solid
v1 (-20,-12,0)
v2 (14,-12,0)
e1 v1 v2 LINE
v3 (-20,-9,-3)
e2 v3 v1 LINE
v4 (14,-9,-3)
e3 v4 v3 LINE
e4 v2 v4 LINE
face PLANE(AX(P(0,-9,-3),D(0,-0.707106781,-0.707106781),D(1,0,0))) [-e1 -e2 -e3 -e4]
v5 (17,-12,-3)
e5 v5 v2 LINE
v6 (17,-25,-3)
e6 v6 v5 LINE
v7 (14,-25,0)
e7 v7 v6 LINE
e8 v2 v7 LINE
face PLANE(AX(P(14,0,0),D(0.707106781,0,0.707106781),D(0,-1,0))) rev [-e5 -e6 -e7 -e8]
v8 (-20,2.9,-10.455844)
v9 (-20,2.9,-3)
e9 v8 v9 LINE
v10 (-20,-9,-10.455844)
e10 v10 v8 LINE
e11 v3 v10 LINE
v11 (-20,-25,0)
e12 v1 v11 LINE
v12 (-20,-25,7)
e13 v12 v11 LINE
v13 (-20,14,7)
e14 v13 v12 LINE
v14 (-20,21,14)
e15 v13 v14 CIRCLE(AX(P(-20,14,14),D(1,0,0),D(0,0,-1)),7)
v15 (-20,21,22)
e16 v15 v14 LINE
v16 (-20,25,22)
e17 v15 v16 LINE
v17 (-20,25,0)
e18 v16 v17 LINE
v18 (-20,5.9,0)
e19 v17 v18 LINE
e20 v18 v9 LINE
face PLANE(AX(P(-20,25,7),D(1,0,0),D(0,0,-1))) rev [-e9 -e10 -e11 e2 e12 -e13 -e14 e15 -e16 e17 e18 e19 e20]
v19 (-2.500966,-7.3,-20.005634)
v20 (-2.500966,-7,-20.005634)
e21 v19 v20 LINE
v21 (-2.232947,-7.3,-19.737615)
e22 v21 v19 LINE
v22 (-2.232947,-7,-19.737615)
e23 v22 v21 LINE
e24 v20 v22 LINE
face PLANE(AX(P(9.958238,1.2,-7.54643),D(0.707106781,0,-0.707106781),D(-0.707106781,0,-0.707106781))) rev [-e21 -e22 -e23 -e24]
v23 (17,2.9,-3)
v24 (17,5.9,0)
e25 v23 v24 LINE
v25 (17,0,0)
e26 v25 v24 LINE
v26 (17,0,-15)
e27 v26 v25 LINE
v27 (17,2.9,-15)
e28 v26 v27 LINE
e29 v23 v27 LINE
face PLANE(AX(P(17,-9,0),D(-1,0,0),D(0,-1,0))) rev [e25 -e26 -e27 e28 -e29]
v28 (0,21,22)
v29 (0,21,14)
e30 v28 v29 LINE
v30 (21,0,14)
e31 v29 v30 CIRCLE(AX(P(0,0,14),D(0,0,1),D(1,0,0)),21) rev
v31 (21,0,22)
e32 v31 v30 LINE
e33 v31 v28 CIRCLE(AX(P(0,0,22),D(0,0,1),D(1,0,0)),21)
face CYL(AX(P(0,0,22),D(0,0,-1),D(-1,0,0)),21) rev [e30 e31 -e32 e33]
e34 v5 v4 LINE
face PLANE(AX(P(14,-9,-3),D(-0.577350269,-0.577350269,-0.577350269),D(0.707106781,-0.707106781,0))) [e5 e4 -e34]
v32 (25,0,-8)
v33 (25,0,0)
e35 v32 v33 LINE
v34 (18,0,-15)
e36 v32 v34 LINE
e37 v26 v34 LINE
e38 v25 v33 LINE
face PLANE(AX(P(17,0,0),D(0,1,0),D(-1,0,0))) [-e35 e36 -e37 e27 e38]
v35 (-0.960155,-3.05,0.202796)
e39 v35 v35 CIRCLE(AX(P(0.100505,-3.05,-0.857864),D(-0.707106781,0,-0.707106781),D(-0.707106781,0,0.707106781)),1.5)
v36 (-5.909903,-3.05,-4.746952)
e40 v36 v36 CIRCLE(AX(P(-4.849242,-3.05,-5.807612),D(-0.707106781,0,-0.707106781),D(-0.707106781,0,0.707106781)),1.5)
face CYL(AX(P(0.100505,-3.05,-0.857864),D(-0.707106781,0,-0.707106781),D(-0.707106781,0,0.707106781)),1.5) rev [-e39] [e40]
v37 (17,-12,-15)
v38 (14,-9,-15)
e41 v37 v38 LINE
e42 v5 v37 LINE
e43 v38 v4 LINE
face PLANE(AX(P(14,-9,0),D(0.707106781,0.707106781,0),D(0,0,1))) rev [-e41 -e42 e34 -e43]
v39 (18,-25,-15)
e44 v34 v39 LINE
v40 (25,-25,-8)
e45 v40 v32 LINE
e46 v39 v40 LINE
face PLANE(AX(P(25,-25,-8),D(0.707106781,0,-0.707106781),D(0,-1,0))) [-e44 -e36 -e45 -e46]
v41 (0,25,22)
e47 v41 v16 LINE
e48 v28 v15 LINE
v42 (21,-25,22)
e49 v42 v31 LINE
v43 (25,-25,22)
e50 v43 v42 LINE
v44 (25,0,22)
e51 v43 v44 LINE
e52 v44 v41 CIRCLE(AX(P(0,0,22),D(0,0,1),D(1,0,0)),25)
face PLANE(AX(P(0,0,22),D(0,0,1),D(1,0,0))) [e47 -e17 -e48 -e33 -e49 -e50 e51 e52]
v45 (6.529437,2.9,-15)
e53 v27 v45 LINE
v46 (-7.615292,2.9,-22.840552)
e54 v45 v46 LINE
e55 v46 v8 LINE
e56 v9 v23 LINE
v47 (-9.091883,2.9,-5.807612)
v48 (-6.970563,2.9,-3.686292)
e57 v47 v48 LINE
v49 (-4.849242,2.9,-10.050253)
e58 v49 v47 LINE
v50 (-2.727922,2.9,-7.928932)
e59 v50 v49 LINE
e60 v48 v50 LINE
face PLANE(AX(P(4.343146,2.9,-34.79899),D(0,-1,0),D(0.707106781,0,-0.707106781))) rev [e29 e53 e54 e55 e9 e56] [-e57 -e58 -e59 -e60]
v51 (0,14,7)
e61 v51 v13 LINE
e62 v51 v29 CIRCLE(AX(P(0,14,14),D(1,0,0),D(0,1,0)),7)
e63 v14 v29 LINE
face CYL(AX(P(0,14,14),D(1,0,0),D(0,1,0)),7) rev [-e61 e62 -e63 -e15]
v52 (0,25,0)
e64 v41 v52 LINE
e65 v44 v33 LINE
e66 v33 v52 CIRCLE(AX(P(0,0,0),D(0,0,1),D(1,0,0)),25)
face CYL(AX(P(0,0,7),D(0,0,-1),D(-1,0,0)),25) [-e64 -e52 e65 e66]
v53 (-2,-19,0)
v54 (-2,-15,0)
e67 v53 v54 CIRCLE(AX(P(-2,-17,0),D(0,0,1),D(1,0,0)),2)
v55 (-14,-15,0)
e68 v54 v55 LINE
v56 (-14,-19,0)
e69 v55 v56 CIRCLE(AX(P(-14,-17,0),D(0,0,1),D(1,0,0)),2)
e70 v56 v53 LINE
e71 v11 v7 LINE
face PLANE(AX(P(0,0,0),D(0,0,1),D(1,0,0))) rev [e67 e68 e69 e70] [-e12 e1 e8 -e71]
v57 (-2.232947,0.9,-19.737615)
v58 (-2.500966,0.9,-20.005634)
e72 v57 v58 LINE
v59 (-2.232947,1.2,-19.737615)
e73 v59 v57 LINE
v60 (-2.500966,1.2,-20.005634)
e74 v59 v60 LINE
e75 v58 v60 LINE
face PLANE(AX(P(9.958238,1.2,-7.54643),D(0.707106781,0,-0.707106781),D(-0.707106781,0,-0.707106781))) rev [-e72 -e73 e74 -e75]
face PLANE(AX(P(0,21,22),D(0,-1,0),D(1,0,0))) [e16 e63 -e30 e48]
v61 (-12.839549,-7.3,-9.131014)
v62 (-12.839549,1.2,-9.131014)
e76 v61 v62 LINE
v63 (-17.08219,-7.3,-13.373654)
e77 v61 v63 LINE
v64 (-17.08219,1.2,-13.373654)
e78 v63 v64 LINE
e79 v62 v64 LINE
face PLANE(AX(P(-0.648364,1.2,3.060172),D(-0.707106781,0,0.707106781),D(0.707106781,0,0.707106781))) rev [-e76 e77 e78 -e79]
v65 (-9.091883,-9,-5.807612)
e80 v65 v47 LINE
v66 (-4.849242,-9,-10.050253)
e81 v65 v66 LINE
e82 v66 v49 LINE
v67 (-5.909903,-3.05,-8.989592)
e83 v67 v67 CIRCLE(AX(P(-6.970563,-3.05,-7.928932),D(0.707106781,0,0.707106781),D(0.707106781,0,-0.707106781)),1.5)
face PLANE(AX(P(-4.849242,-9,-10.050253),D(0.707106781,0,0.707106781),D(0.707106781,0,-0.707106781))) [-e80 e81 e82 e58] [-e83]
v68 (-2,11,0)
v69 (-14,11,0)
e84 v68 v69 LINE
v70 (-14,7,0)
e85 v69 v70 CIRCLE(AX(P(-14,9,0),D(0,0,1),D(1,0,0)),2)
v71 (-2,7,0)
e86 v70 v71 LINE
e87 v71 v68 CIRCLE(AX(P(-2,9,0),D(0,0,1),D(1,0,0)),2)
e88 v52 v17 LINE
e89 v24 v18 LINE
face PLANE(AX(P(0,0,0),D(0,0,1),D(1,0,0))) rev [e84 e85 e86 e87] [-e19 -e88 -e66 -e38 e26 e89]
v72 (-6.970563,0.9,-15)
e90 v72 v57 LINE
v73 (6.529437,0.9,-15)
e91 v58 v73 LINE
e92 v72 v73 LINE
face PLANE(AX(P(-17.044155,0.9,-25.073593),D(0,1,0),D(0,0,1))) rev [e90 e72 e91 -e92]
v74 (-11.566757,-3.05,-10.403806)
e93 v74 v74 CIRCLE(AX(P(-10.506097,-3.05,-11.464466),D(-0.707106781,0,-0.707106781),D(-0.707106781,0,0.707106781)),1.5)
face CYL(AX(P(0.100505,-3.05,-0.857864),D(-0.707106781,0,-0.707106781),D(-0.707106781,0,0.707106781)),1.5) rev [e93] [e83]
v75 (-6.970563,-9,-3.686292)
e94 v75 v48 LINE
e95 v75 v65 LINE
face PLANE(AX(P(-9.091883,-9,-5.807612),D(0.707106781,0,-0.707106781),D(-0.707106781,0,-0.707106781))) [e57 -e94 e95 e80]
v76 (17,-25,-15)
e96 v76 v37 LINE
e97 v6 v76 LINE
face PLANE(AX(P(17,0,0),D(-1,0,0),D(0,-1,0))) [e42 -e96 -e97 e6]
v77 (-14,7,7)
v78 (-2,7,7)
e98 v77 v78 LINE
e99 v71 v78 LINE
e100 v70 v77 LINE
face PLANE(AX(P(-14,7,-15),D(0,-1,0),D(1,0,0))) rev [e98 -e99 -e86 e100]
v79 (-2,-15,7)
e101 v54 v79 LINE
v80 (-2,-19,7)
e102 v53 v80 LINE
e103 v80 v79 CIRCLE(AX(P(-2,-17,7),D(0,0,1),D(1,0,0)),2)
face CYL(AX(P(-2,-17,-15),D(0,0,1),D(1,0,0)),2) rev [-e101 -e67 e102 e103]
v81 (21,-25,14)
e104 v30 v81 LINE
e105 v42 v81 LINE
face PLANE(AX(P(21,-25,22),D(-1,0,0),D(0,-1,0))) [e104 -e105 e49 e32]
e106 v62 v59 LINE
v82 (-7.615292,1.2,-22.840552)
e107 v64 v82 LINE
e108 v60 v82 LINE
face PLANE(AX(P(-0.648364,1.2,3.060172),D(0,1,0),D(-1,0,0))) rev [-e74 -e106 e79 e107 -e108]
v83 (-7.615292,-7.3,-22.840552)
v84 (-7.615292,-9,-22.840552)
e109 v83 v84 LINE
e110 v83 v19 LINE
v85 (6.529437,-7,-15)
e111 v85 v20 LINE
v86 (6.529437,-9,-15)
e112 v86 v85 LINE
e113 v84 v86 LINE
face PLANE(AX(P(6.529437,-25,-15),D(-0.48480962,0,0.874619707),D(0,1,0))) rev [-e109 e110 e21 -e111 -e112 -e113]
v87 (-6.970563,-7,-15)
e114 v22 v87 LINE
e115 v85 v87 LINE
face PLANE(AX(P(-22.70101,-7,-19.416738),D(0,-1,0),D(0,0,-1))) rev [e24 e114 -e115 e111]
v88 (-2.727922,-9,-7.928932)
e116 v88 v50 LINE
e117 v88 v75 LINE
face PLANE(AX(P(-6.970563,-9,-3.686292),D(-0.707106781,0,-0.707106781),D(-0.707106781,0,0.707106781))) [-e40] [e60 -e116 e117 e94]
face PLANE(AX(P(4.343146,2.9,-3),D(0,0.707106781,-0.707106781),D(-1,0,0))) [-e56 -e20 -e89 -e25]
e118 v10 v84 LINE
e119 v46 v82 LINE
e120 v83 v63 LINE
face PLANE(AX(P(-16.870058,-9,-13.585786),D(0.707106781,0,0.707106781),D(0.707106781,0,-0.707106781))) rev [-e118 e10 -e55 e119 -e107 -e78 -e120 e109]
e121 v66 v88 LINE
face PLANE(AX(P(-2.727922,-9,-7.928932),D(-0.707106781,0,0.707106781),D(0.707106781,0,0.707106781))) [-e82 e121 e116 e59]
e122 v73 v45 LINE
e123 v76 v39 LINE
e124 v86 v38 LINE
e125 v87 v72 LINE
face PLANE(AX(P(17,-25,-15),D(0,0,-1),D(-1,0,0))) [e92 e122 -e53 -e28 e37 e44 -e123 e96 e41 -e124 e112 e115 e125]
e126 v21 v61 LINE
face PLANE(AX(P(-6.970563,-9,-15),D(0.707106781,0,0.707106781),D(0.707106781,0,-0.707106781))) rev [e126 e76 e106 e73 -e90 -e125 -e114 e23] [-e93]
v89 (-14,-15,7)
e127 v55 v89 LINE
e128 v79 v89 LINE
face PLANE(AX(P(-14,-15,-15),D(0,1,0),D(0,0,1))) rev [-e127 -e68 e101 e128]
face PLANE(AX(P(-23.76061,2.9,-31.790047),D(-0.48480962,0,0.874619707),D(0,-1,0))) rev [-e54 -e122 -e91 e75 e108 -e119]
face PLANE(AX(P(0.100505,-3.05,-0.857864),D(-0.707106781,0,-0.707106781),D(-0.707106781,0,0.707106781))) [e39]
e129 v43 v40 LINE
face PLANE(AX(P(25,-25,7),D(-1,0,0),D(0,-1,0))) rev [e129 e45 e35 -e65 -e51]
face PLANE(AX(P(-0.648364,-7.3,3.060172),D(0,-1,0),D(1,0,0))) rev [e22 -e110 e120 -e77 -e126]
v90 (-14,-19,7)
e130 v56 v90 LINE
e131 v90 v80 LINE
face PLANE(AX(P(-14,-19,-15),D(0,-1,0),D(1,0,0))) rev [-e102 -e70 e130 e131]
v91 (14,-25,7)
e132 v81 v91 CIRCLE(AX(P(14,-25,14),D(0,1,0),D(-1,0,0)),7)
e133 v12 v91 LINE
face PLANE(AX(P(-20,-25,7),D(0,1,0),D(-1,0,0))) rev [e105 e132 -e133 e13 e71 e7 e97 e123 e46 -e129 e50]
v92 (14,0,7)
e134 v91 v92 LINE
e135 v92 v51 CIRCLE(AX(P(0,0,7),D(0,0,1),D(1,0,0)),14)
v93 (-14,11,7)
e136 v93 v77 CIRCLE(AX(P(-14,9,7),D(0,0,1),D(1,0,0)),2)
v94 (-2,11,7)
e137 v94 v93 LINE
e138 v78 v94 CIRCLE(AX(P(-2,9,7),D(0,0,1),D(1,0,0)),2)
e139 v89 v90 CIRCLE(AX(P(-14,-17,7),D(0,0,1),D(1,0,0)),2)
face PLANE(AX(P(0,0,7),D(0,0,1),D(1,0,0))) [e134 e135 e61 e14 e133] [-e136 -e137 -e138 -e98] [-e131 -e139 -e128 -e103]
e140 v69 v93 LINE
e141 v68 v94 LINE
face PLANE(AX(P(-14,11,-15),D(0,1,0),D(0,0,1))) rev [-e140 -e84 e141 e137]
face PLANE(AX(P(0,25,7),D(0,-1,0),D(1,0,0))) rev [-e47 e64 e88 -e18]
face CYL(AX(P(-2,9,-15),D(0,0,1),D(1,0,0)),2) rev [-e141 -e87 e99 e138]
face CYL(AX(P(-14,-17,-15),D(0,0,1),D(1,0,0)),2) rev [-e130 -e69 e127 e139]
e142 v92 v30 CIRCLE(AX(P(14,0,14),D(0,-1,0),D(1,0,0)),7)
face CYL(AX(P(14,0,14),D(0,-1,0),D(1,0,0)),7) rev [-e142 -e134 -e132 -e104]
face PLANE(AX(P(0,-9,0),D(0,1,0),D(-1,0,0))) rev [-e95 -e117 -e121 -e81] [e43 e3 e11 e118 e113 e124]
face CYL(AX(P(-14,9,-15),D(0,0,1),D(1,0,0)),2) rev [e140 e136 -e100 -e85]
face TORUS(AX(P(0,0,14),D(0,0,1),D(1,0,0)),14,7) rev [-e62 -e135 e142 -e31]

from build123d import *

# Parameters (mm, degrees)
BOSS_EXTRUDE1_DEPTH      = 7
EXTRUDE_THIN2_DEPTH      = 15
FILLET1_R                = 7
SKETCH5_W                = 15
SKETCH5_H                = 25
BOSS_EXTRUDE2_DEPTH      = 8
CUT_EXTRUDE2_DEPTH       = 42.641325627
LPATTERN1_COUNT          = 2
LPATTERN1_PITCH          = 26
CHAMFER3_SIZE            = 7
SKETCH9_W                = 15
SKETCH9_H                = 7
BOSS_EXTRUDE3_DEPTH      = 15
BOSS_EXTRUDE4_DEPTH      = 2
BOSS_EXTRUDE4_DEPTH_BACK = 9.9
SKETCH13_W               = 8
SKETCH13_H               = 2
BOSS_EXTRUDE6_DEPTH      = 6
CHAMFER6_SIZE            = 23.744712882
CHAMFER6_SIZE_2          = 13.5
CHAMFER7_SIZE            = 3
SKETCH14_R               = 1.5
CUT_EXTRUDE3_DEPTH       = 15
SKETCH15_W               = 15
SKETCH15_H               = 8.5
CUT_EXTRUDE4_DEPTH       = 6


with BuildPart() as part:
    # Sketch1 → Boss-Extrude1 (new body)
    with BuildSketch(Plane.XY):
        with BuildLine():
            Line((0, 25), (-20, 25))
            Line((-20, 25), (-20, -25))
            Line((-20, -25), (25, -25))
            Line((25, -25), (25, 0))
            ThreePointArc((25, 0), (17.67766953, 17.67766953), (0, 25))
        make_face()
    extrude(amount=BOSS_EXTRUDE1_DEPTH)

    # Sketch3 → Extrude-Thin2 (add)
    with BuildSketch(Plane.XY.offset(7)):
        with BuildLine():
            Line((25, -25), (25, 0))
            ThreePointArc((25, 0), (17.67766953, 17.67766953), (0, 25))
            Line((0, 25), (-20, 25))
            Line((-20, 25), (-20, 21))
            Line((-20, 21), (0, 21))
            ThreePointArc((0, 21), (14.849242405, 14.849242405), (21, 0))
            Line((21, 0), (21, -25))
            Line((21, -25), (25, -25))
        make_face()
    extrude(amount=EXTRUDE_THIN2_DEPTH)

    # Fillet1
    fillet1_edges = [part.edges().sort_by_distance(p)[0] for p in [
        (21, -12.5, 7),
        (14.849242405, 14.849242405, 7),
        (-10, 21, 7),
    ]]
    fillet(fillet1_edges, radius=FILLET1_R)

    # Sketch5 → Boss-Extrude2 (add)
    with BuildSketch(Plane(origin=(25, 0, 0), x_dir=(0, 0, -1), z_dir=(1, 0, 0))):
        with Locations((7.5, -12.5)):
            Rectangle(SKETCH5_W, SKETCH5_H)
    extrude(amount=-BOSS_EXTRUDE2_DEPTH)

    # Sketch8 → Cut-Extrude2 (cut, through all)
    with BuildSketch(Plane.XY.offset(7)):
        with BuildLine():
            Line((-14, -15), (-2, -15))
            ThreePointArc((-2, -15), (0, -17), (-2, -19))
            Line((-2, -19), (-14, -19))
            ThreePointArc((-14, -19), (-16, -17), (-14, -15))
        make_face()
    cut_extrude2 = extrude(amount=-CUT_EXTRUDE2_DEPTH, mode=Mode.SUBTRACT)

    # LPattern1: Cut-Extrude2 ×2
    with Locations(*[(0, i * LPATTERN1_PITCH, 0) for i in range(1, LPATTERN1_COUNT)]):
        add(cut_extrude2, mode=Mode.SUBTRACT)

    # Chamfer3
    chamfer3_edges = [part.edges().sort_by_distance(p)[0] for p in [
        (25, -12.5, -15),
    ]]
    chamfer(chamfer3_edges, length=CHAMFER3_SIZE)

    # Sketch9 → Boss-Extrude3 (add)
    with BuildSketch(Plane.ZY.offset(-17)):
        with Locations((-7.5, -3.5)):
            Rectangle(SKETCH9_W, SKETCH9_H)
    extrude(amount=BOSS_EXTRUDE3_DEPTH)

    # Sketch10 → Boss-Extrude4 (add, two sides: drawn at the far end of the back side and taken through both)
    with BuildSketch(Plane.XZ.offset(7).offset(-BOSS_EXTRUDE4_DEPTH_BACK)):
        Polygon((2, -15), (-6.970562748, -15), (-12.627416998, -9.343145751), (-16.870057685, -13.585786438), (-20, -10.455844123), (-20, 0), (17, 0), (17, -15), align=None)
        Polygon((-4.849242405, -10.050252532), (-9.091883092, -5.807611845), (-6.970562748, -3.686291501), (-2.727922061, -7.928932188), align=None, mode=Mode.SUBTRACT)
    extrude(amount=BOSS_EXTRUDE4_DEPTH + BOSS_EXTRUDE4_DEPTH_BACK)

    # Sketch13 → Boss-Extrude6 (add)
    with BuildSketch(Plane(origin=(-10.985281374, 0, -10.985281374), x_dir=(-0.7071067811865478, 0, 0.7071067811865472), z_dir=(-0.7071067811865472, 0, -0.7071067811865478))):
        with Locations((-1.67766953, 1.9)):
            Rectangle(SKETCH13_W, SKETCH13_H)
        with Locations((-1.67766953, -8)):
            Rectangle(SKETCH13_W, SKETCH13_H)
    extrude(amount=BOSS_EXTRUDE6_DEPTH)

    # Chamfer6
    # the kernel refuses this chamfer: 23.744712882, 13.5 mm, written as the material it adds along each edge
    with BuildSketch(Plane(origin=(-6.970562748, -9, -15), x_dir=(-0.7145740403020574, 0, -0.6995598194053126), z_dir=(0, 1, 0))) as chamfer6_piece_1_section:
        Polygon((CHAMFER6_SIZE * 0.999943641689, -CHAMFER6_SIZE * 0.0106166574102), (-CHAMFER6_SIZE_2 * 0.714574040302, -CHAMFER6_SIZE_2 * 0.699559819405), (0, 0), align=None)
    chamfer6_piece_1 = extrude(amount=2, mode=Mode.PRIVATE)
    chamfer6_piece_1 = split(chamfer6_piece_1, bisect_by=Plane(origin=(-9.095447466, -8, -21.360396657), z_dir=(0.7071067811865476, 0, 0.7071067811865476)), keep=Keep.TOP, mode=Mode.PRIVATE)
    add(chamfer6_piece_1)
    with BuildSketch(Plane(origin=(-6.970562748, -70.647744863, -15), x_dir=(-0.7145740403020574, 0, -0.6995598194053126), z_dir=(0, 1, 0))) as chamfer6_piece_2_section:
        Polygon((CHAMFER6_SIZE * 0.999943641689, -CHAMFER6_SIZE * 0.0106166574102), (-CHAMFER6_SIZE_2 * 0.714574040302, -CHAMFER6_SIZE_2 * 0.699559819405), (0, 0), align=None)
    chamfer6_piece_2 = extrude(amount=125.295489727, mode=Mode.PRIVATE)
    chamfer6_piece_2 = split(chamfer6_piece_2, bisect_by=Plane(origin=(-6.871868761, 2.9, -19.136817952), z_dir=(0, -1, 0)), keep=Keep.TOP, mode=Mode.PRIVATE)
    chamfer6_piece_2 = split(chamfer6_piece_2, bisect_by=Plane(origin=(-6.871868761, 0.9, -19.136817952), z_dir=(0, 1, 0)), keep=Keep.TOP, mode=Mode.PRIVATE)
    chamfer6_piece_2 = split(chamfer6_piece_2, bisect_by=Plane(origin=(-9.095447466, 1.9, -21.360396657), z_dir=(0.7071067811865476, 0, 0.7071067811865476)), keep=Keep.TOP, mode=Mode.PRIVATE)
    add(chamfer6_piece_2)
    with BuildSketch(Plane(origin=(-6.970562748, -60.747744863, -15), x_dir=(-0.7145740403020574, 0, -0.6995598194053126), z_dir=(0, 1, 0))) as chamfer6_piece_3_section:
        Polygon((CHAMFER6_SIZE * 0.999943641689, -CHAMFER6_SIZE * 0.0106166574102), (-CHAMFER6_SIZE_2 * 0.714574040302, -CHAMFER6_SIZE_2 * 0.699559819405), (0, 0), align=None)
    chamfer6_piece_3 = extrude(amount=125.295489727, mode=Mode.PRIVATE)
    chamfer6_piece_3 = split(chamfer6_piece_3, bisect_by=Plane(origin=(-6.871868761, -7, -19.136817952), z_dir=(0, -1, 0)), keep=Keep.TOP, mode=Mode.PRIVATE)
    chamfer6_piece_3 = split(chamfer6_piece_3, bisect_by=Plane(origin=(-9.095447466, -8, -21.360396657), z_dir=(0.7071067811865476, 0, 0.7071067811865476)), keep=Keep.TOP, mode=Mode.PRIVATE)
    chamfer6_piece_3 = split(chamfer6_piece_3, bisect_by=Plane(origin=(-6.871868761, -9, -19.136817952), z_dir=(0, 1, 0)), keep=Keep.TOP, mode=Mode.PRIVATE)
    add(chamfer6_piece_3)
    with BuildSketch(Plane(origin=(-6.970562748, 0.9, -15), x_dir=(-0.7145740403020574, 0, -0.6995598194053126), z_dir=(0, 1, 0))) as chamfer6_piece_4_section:
        Polygon((CHAMFER6_SIZE * 0.999943641689, -CHAMFER6_SIZE * 0.0106166574102), (-CHAMFER6_SIZE_2 * 0.714574040302, -CHAMFER6_SIZE_2 * 0.699559819405), (0, 0), align=None)
    chamfer6_piece_4 = extrude(amount=2, mode=Mode.PRIVATE)
    chamfer6_piece_4 = split(chamfer6_piece_4, bisect_by=Plane(origin=(-9.095447466, 1.9, -21.360396657), z_dir=(0.7071067811865476, 0, 0.7071067811865476)), keep=Keep.TOP, mode=Mode.PRIVATE)
    add(chamfer6_piece_4)

    # Chamfer7
    chamfer7_edges = [part.edges().sort_by_distance(p)[0] for p in [
        (-1.5, 2.9, 0),
        (17, -9, -7.5),
        (17, -17, 0),
        (-1.5, -9, 0),
    ]]
    chamfer(chamfer7_edges, length=CHAMFER7_SIZE)

    # Sketch14 → Cut-Extrude3 (cut)
    with BuildSketch(Plane(origin=(-10.985281374, 0, -10.985281374), x_dir=(-0.7071067811865478, 0, 0.7071067811865472), z_dir=(-0.7071067811865472, 0, -0.7071067811865478))):
        with Locations((-0.67766953, -3.05)):
            Circle(SKETCH14_R)
    extrude(amount=-CUT_EXTRUDE3_DEPTH, mode=Mode.SUBTRACT)

    # Sketch15 → Cut-Extrude4 (cut)
    with BuildSketch(Plane(origin=(-15.227922061, 0, -15.227922061), x_dir=(-0.7071067811865475, 0, 0.7071067811865477), z_dir=(-0.7071067811865477, 0, -0.7071067811865475))):
        with Locations((-4.87766953, -3.05)):
            Rectangle(SKETCH15_W, SKETCH15_H)
    extrude(amount=-CUT_EXTRUDE4_DEPTH, mode=Mode.SUBTRACT)


solid = part.part
